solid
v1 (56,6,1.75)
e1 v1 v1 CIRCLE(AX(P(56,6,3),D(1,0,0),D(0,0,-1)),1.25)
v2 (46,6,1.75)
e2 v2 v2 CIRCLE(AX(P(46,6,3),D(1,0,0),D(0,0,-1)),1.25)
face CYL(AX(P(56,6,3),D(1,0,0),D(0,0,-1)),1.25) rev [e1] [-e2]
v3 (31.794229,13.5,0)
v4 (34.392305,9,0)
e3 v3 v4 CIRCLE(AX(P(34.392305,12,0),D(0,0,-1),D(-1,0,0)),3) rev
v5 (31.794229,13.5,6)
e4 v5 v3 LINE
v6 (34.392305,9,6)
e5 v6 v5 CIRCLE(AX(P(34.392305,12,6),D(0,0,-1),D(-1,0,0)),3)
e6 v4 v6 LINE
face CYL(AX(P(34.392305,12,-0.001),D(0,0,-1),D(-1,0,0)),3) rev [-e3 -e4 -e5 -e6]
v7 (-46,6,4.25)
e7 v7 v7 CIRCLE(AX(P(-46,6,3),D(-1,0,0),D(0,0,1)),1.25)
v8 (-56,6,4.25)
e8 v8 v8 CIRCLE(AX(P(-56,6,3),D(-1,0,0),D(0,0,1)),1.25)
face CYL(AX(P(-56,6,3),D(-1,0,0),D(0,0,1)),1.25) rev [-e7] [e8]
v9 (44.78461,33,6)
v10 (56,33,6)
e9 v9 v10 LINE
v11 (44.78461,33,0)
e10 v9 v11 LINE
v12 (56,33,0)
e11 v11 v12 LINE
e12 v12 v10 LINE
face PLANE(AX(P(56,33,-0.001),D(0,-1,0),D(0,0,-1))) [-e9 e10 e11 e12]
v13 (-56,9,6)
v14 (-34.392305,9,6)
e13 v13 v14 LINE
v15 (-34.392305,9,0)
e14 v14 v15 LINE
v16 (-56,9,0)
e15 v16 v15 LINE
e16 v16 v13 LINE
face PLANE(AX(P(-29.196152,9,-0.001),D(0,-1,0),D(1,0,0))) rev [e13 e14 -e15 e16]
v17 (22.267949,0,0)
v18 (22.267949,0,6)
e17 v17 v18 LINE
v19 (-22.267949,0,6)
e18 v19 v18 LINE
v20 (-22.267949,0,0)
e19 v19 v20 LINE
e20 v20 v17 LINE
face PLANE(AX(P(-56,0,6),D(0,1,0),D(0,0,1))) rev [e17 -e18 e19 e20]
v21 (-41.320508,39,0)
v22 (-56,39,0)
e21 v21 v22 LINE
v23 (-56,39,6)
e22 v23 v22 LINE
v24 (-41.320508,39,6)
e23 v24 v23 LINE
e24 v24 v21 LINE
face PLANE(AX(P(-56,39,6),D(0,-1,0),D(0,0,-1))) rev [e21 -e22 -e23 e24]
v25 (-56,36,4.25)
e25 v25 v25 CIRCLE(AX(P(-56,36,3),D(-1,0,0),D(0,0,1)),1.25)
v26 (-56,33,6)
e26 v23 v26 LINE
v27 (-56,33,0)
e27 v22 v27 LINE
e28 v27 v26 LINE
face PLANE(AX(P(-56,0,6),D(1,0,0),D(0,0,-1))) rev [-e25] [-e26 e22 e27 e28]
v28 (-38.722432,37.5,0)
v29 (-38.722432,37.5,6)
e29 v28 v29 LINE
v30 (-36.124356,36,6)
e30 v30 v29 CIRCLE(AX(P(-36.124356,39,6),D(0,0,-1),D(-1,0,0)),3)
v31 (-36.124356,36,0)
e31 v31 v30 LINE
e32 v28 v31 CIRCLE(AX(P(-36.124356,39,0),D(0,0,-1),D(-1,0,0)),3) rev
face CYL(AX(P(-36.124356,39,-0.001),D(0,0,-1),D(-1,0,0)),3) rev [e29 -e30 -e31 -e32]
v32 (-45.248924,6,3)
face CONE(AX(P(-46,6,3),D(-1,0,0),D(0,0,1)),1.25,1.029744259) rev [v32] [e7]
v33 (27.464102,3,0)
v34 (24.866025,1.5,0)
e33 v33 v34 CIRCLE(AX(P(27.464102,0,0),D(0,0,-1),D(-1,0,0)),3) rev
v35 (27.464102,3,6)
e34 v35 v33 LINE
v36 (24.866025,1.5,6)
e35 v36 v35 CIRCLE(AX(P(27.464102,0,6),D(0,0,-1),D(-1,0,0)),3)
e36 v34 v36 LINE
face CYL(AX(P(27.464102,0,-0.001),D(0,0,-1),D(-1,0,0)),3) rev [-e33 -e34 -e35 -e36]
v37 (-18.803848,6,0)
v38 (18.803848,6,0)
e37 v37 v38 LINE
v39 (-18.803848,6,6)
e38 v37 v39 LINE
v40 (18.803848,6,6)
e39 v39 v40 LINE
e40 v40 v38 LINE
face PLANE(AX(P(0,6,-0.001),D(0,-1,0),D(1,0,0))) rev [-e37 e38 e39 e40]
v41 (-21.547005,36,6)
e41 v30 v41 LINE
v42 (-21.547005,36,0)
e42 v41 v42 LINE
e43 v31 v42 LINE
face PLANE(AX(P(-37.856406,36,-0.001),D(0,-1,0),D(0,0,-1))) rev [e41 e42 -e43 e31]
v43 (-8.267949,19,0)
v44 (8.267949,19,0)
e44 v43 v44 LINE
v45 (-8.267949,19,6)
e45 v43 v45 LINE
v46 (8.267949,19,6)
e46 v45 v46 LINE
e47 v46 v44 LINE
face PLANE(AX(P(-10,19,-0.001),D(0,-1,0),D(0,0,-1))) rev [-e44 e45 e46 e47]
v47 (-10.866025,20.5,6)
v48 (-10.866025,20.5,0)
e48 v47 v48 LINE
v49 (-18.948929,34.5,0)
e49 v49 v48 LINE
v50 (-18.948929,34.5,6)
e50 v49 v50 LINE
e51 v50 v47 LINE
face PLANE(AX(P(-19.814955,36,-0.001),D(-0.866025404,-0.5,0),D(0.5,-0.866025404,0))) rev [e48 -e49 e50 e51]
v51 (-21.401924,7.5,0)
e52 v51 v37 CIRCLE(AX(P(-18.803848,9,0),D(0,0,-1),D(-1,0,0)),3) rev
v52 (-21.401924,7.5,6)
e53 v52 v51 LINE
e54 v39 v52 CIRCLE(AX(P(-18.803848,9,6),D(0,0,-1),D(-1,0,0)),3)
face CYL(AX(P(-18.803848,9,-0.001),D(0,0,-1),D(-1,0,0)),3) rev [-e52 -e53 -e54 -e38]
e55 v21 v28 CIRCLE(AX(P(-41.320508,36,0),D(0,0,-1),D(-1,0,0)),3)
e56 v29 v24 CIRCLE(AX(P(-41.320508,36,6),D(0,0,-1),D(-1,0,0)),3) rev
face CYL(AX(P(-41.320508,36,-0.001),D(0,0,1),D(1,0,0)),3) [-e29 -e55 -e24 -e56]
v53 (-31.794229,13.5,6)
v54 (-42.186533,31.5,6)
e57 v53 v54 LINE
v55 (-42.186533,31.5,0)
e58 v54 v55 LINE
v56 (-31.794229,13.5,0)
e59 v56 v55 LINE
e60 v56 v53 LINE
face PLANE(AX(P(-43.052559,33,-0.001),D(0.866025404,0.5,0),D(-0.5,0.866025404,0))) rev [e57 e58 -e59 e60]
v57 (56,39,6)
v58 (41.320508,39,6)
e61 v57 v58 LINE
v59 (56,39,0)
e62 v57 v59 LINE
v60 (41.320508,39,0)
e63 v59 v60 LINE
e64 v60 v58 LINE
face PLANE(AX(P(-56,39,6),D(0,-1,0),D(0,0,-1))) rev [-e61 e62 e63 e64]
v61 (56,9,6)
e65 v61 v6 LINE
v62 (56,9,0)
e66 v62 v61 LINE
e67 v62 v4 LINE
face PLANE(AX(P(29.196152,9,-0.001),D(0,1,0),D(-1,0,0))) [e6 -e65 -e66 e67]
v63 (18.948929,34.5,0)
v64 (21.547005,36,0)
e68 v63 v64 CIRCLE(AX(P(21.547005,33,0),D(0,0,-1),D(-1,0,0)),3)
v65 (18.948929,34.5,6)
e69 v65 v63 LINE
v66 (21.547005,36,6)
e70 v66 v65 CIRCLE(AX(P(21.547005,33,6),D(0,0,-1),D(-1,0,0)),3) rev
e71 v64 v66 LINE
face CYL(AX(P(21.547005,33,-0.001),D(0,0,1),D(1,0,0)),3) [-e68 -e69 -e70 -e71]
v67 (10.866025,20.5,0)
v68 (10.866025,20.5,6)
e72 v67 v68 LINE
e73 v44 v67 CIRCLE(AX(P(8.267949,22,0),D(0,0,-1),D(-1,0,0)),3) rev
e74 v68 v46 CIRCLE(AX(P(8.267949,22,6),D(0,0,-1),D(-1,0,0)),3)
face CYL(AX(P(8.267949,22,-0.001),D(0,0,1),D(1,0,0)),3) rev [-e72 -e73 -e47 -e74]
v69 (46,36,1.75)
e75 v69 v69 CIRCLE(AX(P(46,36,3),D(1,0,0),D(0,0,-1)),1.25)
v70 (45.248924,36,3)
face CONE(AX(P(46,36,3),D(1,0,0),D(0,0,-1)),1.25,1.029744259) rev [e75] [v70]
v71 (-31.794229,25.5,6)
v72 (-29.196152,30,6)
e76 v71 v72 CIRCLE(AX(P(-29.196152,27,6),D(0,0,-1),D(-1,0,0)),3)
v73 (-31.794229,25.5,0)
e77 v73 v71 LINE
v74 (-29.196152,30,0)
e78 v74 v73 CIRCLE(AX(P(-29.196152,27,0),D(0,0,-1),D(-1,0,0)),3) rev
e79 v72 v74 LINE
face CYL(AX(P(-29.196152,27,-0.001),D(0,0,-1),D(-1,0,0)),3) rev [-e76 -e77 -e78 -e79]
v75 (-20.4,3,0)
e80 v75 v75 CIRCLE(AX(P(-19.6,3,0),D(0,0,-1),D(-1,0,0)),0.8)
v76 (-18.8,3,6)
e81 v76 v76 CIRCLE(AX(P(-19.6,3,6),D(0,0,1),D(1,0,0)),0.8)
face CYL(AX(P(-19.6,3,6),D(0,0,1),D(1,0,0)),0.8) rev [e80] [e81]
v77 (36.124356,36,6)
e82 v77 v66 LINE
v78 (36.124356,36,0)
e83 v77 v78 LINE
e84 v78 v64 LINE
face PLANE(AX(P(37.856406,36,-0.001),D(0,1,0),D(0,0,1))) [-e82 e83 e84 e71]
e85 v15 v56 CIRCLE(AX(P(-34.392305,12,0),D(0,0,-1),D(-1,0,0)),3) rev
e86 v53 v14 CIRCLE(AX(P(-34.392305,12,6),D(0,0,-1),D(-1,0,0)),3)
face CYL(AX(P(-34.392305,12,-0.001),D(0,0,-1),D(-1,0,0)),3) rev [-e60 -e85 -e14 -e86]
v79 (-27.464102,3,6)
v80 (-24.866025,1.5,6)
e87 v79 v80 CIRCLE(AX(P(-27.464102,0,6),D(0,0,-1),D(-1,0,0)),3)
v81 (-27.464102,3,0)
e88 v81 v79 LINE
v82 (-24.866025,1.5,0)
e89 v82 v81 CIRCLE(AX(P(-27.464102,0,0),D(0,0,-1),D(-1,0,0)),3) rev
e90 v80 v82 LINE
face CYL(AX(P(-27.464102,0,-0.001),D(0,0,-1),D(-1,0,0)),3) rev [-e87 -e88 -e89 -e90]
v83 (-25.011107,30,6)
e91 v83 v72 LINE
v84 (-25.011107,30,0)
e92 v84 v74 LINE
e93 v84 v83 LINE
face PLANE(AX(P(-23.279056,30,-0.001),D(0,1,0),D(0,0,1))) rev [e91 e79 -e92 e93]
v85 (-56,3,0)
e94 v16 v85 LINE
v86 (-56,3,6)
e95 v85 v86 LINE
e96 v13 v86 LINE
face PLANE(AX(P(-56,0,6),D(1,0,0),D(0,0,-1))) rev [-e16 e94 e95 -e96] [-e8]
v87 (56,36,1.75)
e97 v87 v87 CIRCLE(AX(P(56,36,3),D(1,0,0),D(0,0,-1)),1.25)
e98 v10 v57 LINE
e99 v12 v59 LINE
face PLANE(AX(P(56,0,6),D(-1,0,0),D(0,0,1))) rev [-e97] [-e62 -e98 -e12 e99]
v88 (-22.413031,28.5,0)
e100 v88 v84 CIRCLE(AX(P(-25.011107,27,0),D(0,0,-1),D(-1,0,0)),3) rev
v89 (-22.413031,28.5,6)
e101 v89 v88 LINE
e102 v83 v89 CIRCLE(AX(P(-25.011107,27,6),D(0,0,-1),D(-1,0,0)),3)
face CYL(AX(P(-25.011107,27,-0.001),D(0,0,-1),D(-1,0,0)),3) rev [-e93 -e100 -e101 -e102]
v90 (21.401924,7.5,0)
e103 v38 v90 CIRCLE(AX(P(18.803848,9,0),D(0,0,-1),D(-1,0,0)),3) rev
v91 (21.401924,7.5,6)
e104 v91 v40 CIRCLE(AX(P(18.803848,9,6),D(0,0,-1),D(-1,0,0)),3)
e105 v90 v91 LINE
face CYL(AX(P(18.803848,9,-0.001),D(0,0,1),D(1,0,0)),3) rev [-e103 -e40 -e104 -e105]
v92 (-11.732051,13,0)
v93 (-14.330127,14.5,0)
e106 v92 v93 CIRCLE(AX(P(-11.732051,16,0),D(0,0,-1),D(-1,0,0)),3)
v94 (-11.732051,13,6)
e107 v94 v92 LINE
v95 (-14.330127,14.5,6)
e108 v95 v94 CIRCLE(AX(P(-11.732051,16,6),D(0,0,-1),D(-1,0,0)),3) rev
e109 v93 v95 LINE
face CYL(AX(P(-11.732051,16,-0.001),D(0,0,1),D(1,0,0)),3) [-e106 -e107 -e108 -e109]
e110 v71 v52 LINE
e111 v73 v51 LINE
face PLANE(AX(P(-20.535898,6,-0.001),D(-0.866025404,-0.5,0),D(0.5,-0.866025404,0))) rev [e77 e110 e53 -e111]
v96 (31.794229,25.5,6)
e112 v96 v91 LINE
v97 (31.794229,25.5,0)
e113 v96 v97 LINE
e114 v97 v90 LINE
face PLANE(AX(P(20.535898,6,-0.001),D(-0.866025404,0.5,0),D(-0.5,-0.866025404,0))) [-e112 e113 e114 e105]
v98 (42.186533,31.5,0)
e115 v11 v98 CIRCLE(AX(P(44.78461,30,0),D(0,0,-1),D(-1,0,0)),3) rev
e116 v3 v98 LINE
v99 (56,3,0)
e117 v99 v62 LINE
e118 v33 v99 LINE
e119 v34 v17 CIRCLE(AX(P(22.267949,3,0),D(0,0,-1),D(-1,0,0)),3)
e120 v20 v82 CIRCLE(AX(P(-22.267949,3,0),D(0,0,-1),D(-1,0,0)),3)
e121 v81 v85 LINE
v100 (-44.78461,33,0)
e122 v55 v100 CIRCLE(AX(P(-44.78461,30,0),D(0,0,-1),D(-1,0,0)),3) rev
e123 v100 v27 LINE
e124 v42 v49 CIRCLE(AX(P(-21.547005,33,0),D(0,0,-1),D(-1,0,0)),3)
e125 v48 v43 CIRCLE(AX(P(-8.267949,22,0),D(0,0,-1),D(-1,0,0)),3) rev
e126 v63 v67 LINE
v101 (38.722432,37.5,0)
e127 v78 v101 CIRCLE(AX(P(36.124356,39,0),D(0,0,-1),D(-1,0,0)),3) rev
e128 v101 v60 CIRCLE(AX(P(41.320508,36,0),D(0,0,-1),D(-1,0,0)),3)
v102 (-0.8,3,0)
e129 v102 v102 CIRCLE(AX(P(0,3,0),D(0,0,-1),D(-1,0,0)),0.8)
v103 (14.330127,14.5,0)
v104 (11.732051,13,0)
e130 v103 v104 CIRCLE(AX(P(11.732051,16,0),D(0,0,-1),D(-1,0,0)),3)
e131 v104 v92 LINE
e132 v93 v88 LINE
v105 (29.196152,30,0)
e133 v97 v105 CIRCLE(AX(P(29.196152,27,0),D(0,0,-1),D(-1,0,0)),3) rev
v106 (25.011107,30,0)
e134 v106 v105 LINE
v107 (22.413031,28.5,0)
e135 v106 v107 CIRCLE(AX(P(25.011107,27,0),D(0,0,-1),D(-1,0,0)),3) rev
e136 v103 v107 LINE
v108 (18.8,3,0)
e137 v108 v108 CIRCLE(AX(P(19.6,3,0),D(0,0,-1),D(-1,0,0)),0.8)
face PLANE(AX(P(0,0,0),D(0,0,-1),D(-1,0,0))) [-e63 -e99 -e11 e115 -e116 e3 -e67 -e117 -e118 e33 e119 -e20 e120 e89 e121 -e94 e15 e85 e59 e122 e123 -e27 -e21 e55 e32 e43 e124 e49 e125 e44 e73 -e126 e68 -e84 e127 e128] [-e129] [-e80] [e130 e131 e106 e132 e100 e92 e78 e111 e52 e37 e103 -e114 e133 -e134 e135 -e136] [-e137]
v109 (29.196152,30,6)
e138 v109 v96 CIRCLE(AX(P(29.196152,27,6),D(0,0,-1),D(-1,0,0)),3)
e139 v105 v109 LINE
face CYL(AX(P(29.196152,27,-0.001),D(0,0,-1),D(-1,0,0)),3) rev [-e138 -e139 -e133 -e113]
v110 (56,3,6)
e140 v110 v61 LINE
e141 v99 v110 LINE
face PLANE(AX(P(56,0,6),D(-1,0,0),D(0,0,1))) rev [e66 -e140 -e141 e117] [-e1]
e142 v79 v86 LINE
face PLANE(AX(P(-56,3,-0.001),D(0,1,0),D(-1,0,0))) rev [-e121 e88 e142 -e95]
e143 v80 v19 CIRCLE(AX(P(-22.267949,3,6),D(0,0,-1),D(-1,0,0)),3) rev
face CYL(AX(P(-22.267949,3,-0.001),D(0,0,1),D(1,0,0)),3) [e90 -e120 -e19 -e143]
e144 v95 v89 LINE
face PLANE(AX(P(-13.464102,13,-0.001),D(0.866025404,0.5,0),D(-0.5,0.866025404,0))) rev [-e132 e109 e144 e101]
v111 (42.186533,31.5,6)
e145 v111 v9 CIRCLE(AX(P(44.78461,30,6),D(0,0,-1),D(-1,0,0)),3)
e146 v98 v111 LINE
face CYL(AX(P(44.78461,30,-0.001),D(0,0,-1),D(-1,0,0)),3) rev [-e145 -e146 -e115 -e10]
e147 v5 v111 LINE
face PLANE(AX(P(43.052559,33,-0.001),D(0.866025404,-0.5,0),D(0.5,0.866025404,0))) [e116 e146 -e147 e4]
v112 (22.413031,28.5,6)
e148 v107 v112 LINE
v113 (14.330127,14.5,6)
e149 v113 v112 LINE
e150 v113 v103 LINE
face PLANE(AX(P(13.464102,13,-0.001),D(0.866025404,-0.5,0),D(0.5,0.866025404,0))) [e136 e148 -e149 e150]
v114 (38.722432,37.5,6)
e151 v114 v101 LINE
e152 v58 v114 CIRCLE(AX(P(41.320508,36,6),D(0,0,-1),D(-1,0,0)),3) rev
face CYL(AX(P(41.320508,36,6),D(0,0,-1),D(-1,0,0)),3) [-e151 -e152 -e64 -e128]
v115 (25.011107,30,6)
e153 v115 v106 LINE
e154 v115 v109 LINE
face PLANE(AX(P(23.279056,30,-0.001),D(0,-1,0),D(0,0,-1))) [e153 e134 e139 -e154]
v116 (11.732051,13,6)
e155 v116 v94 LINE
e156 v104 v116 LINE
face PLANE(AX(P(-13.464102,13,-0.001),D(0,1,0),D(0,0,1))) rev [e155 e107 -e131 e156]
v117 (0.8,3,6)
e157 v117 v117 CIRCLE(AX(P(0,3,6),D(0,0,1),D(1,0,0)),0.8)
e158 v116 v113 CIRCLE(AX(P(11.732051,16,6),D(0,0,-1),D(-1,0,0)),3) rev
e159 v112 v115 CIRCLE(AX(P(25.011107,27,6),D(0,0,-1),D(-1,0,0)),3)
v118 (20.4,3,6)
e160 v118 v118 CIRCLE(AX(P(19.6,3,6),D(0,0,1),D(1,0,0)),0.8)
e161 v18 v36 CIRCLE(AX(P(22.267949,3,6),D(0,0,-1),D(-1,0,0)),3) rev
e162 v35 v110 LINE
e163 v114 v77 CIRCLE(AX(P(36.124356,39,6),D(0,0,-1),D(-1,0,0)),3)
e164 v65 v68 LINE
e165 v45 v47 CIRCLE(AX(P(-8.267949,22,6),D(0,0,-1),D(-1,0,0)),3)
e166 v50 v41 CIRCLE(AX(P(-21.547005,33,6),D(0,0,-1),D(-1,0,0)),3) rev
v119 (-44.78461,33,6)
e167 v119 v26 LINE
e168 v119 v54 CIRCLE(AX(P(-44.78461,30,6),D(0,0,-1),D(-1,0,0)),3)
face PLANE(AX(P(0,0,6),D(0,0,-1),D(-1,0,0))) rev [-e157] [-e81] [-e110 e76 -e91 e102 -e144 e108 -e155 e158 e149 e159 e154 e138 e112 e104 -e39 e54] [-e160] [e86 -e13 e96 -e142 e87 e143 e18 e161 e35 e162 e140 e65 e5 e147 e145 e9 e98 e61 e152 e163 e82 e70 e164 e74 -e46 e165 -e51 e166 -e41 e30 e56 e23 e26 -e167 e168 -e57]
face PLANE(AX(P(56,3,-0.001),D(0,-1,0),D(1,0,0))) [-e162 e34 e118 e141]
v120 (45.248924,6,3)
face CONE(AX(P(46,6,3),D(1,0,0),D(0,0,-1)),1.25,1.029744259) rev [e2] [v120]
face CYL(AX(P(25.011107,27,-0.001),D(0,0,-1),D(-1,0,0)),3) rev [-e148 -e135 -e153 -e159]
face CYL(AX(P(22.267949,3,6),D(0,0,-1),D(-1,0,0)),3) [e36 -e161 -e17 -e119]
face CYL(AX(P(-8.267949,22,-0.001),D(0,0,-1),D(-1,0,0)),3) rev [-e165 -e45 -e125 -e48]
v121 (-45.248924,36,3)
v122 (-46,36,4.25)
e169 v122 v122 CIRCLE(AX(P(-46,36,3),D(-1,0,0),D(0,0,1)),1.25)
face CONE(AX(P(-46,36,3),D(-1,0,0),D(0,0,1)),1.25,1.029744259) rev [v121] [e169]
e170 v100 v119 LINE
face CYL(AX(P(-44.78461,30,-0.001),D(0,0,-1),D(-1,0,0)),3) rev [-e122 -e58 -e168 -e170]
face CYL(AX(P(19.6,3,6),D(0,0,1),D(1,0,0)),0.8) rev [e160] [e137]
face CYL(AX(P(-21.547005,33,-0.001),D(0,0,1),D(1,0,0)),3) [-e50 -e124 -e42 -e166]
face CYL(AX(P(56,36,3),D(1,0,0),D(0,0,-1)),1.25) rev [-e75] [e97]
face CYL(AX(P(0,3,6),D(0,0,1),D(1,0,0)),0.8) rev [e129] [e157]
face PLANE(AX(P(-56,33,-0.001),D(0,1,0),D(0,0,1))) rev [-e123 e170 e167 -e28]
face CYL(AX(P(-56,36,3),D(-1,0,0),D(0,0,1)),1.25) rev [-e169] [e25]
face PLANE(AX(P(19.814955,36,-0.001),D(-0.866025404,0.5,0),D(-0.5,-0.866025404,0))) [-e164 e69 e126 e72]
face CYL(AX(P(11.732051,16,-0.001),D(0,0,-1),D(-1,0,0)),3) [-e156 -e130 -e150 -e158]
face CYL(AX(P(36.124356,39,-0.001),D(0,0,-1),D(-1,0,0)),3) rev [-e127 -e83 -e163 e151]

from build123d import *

# Parameters (mm, degrees)
SKETCH1_W                        = 112
SKETCH1_H                        = 39
BOSS_EXTRUDE1_DEPTH              = 6
CUT_EXTRUDE1_REACH               = 70.505
TAP_DRILL_FOR_M3_TAP1_AT_2_COUNT = 2
TAP_DRILL_FOR_M3_TAP1_AT_2_PITCH = 30
FILLET1_R                        = 3
FILLET1_OF_MIRROR1_R             = 3
TAP_DRILL_FOR_M2_TAP1_D          = 1.6


with BuildPart() as part:
    # Sketch1 → Boss-Extrude1 (new body)
    with BuildSketch(Plane.XY):
        with Locations((0, 19.5)):
            Rectangle(SKETCH1_W, SKETCH1_H)
    extrude(amount=BOSS_EXTRUDE1_DEPTH)

    # Sketch2 → Cut-Extrude1 (cut, up to next)
    with BuildSketch(Plane.XY.offset(6), mode=Mode.PRIVATE) as cut_extrude1_sk1:
        Polygon((-56, 33), (-43.052558883, 33), (-29.196152423, 9), (-56, 9), align=None)
    cut_extrude1_tool1 = extrude(cut_extrude1_sk1.sketch, amount=-CUT_EXTRUDE1_REACH, mode=Mode.PRIVATE) & part.part
    # Sketch2 → Cut-Extrude1 (cut, up to next)
    with BuildSketch(Plane.XY.offset(6), mode=Mode.PRIVATE) as cut_extrude1_sk2:
        Polygon((-39.588457268, 39), (-37.856406461, 36), (-19.814954576, 36), (-10, 19), (0, 19), (0, 39), align=None)
    cut_extrude1_tool2 = extrude(cut_extrude1_sk2.sketch, amount=-CUT_EXTRUDE1_REACH, mode=Mode.PRIVATE) & part.part
    # Sketch2 → Cut-Extrude1 (cut, up to next)
    with BuildSketch(Plane.XY.offset(6), mode=Mode.PRIVATE) as cut_extrude1_sk3:
        Polygon((-56, 3), (-25.732050808, 3), (-24, 0), (-56, 0), align=None)
    cut_extrude1_tool3 = extrude(cut_extrude1_sk3.sketch, amount=-CUT_EXTRUDE1_REACH, mode=Mode.PRIVATE) & part.part
    # Sketch2 → Cut-Extrude1 (cut, up to next)
    with BuildSketch(Plane.XY.offset(6), mode=Mode.PRIVATE) as cut_extrude1_sk4:
        Polygon((-13.464101615, 13), (0, 13), (0, 6), (-20.535898385, 6), (-34.392304845, 30), (-23.279056191, 30), align=None)
    cut_extrude1_tool4 = extrude(cut_extrude1_sk4.sketch, amount=-CUT_EXTRUDE1_REACH, mode=Mode.PRIVATE) & part.part
    cut_extrude1_1 = cut_extrude1_tool1.solids().sort_by_distance((-45.659675, 19.60569, 6))[0]
    add(cut_extrude1_1, mode=Mode.SUBTRACT)
    cut_extrude1_2 = cut_extrude1_tool2.solids().sort_by_distance((-11.382019, 31.286174, 6))[0]
    add(cut_extrude1_2, mode=Mode.SUBTRACT)
    cut_extrude1_3 = cut_extrude1_tool3.solids().sort_by_distance((-40.428998, 1.486092, 6))[0]
    add(cut_extrude1_3, mode=Mode.SUBTRACT)
    cut_extrude1_4 = cut_extrude1_tool4.solids().sort_by_distance((-18.182863, 16.08438, 6))[0]
    add(cut_extrude1_4, mode=Mode.SUBTRACT)
    cut_extrude1 = cut_extrude1_1 + cut_extrude1_2 + cut_extrude1_3 + cut_extrude1_4  # Cut-Extrude1 as one shape, for the pattern or mirror that repeats it

    # Sketch3 → Tap Drill for M3 Tap1 (revolve, cut)
    with BuildSketch(Plane(origin=(-56, 36, 3), x_dir=(0, 0, 1), z_dir=(0, 1, 0))):
        Polygon((0, 0), (0, 10.751075774), (1.25, 10), (1.25, 0), align=None)
    tap_drill_for_m3_tap1 = revolve(axis=Axis((-62.35, 36, 3), (1, 0, 0)), mode=Mode.SUBTRACT)

    # Tap Drill for M3 Tap1 at 2: Tap Drill for M3 Tap1 ×2
    with Locations(*[(0, -i * TAP_DRILL_FOR_M3_TAP1_AT_2_PITCH, 0) for i in range(1, TAP_DRILL_FOR_M3_TAP1_AT_2_COUNT)]):
        add(tap_drill_for_m3_tap1, mode=Mode.SUBTRACT)

    # Fillet1
    fillet1_edges = [part.edges().sort_by_distance(p)[0] for p in [
        (-43.052558883, 33, 3),
        (-29.196152423, 9, 3),
        (-39.588457268, 39, 3),
        (-10, 19, 3),
        (-19.814954576, 36, 3),
        (-37.856406461, 36, 3),
        (-23.279056191, 30, 3),
        (-13.464101615, 13, 3),
        (-20.535898385, 6, 3),
        (-34.392304845, 30, 3),
        (-25.732050808, 3, 3),
        (-24, 0, 3),
    ]]
    fillet(fillet1_edges, radius=FILLET1_R - 0.0001)  # a hair under: the kernel refuses the full size

    # Mirror1: Cut-Extrude1, Tap Drill for M3 Tap1 across plane
    add(cut_extrude1.mirror(Plane(origin=(0, 0, 0), x_dir=(0, 0, 1), z_dir=(1, 0, 0))), mode=Mode.SUBTRACT)
    add(tap_drill_for_m3_tap1.mirror(Plane(origin=(0, 0, 0), x_dir=(0, 0, 1), z_dir=(1, 0, 0))), mode=Mode.SUBTRACT)

    # Mirror1 copy 1 sketch → Mirror1 copy 1 (revolve, cut)
    with BuildSketch(Plane(origin=(56, 6, 3), x_dir=(0, 0, 1), z_dir=(0, 1, 0))):
        Polygon((0, 0), (0, -10.751075774), (1.25, -10), (1.25, 0), align=None)
    revolve(axis=Axis((62.35, 6, 3), (1, 0, 0)), mode=Mode.SUBTRACT)

    # Fillet1 of Mirror1
    fillet1_of_mirror1_edges = [part.edges().sort_by_distance(p)[0] for p in [
        (43.052558883, 33, 3),
        (29.196152423, 9, 3),
        (39.588457268, 39, 3),
        (10, 19, 3),
        (19.814954576, 36, 3),
        (37.856406461, 36, 3),
        (23.279056191, 30, 3),
        (13.464101615, 13, 3),
        (20.535898385, 6, 3),
        (34.392304845, 30, 3),
        (25.732050808, 3, 3),
        (24, 0, 3),
    ]]
    fillet(fillet1_of_mirror1_edges, radius=FILLET1_OF_MIRROR1_R - 0.0001)  # a hair under: the kernel refuses the full size

    # Tap Drill for M2 Tap1 (through all)
    with Locations(Plane.XY.offset(6)):
        with Locations((-19.6, 3), (0, 3), (19.6, 3)):
            Hole(TAP_DRILL_FOR_M2_TAP1_D / 2)


solid = part.part
